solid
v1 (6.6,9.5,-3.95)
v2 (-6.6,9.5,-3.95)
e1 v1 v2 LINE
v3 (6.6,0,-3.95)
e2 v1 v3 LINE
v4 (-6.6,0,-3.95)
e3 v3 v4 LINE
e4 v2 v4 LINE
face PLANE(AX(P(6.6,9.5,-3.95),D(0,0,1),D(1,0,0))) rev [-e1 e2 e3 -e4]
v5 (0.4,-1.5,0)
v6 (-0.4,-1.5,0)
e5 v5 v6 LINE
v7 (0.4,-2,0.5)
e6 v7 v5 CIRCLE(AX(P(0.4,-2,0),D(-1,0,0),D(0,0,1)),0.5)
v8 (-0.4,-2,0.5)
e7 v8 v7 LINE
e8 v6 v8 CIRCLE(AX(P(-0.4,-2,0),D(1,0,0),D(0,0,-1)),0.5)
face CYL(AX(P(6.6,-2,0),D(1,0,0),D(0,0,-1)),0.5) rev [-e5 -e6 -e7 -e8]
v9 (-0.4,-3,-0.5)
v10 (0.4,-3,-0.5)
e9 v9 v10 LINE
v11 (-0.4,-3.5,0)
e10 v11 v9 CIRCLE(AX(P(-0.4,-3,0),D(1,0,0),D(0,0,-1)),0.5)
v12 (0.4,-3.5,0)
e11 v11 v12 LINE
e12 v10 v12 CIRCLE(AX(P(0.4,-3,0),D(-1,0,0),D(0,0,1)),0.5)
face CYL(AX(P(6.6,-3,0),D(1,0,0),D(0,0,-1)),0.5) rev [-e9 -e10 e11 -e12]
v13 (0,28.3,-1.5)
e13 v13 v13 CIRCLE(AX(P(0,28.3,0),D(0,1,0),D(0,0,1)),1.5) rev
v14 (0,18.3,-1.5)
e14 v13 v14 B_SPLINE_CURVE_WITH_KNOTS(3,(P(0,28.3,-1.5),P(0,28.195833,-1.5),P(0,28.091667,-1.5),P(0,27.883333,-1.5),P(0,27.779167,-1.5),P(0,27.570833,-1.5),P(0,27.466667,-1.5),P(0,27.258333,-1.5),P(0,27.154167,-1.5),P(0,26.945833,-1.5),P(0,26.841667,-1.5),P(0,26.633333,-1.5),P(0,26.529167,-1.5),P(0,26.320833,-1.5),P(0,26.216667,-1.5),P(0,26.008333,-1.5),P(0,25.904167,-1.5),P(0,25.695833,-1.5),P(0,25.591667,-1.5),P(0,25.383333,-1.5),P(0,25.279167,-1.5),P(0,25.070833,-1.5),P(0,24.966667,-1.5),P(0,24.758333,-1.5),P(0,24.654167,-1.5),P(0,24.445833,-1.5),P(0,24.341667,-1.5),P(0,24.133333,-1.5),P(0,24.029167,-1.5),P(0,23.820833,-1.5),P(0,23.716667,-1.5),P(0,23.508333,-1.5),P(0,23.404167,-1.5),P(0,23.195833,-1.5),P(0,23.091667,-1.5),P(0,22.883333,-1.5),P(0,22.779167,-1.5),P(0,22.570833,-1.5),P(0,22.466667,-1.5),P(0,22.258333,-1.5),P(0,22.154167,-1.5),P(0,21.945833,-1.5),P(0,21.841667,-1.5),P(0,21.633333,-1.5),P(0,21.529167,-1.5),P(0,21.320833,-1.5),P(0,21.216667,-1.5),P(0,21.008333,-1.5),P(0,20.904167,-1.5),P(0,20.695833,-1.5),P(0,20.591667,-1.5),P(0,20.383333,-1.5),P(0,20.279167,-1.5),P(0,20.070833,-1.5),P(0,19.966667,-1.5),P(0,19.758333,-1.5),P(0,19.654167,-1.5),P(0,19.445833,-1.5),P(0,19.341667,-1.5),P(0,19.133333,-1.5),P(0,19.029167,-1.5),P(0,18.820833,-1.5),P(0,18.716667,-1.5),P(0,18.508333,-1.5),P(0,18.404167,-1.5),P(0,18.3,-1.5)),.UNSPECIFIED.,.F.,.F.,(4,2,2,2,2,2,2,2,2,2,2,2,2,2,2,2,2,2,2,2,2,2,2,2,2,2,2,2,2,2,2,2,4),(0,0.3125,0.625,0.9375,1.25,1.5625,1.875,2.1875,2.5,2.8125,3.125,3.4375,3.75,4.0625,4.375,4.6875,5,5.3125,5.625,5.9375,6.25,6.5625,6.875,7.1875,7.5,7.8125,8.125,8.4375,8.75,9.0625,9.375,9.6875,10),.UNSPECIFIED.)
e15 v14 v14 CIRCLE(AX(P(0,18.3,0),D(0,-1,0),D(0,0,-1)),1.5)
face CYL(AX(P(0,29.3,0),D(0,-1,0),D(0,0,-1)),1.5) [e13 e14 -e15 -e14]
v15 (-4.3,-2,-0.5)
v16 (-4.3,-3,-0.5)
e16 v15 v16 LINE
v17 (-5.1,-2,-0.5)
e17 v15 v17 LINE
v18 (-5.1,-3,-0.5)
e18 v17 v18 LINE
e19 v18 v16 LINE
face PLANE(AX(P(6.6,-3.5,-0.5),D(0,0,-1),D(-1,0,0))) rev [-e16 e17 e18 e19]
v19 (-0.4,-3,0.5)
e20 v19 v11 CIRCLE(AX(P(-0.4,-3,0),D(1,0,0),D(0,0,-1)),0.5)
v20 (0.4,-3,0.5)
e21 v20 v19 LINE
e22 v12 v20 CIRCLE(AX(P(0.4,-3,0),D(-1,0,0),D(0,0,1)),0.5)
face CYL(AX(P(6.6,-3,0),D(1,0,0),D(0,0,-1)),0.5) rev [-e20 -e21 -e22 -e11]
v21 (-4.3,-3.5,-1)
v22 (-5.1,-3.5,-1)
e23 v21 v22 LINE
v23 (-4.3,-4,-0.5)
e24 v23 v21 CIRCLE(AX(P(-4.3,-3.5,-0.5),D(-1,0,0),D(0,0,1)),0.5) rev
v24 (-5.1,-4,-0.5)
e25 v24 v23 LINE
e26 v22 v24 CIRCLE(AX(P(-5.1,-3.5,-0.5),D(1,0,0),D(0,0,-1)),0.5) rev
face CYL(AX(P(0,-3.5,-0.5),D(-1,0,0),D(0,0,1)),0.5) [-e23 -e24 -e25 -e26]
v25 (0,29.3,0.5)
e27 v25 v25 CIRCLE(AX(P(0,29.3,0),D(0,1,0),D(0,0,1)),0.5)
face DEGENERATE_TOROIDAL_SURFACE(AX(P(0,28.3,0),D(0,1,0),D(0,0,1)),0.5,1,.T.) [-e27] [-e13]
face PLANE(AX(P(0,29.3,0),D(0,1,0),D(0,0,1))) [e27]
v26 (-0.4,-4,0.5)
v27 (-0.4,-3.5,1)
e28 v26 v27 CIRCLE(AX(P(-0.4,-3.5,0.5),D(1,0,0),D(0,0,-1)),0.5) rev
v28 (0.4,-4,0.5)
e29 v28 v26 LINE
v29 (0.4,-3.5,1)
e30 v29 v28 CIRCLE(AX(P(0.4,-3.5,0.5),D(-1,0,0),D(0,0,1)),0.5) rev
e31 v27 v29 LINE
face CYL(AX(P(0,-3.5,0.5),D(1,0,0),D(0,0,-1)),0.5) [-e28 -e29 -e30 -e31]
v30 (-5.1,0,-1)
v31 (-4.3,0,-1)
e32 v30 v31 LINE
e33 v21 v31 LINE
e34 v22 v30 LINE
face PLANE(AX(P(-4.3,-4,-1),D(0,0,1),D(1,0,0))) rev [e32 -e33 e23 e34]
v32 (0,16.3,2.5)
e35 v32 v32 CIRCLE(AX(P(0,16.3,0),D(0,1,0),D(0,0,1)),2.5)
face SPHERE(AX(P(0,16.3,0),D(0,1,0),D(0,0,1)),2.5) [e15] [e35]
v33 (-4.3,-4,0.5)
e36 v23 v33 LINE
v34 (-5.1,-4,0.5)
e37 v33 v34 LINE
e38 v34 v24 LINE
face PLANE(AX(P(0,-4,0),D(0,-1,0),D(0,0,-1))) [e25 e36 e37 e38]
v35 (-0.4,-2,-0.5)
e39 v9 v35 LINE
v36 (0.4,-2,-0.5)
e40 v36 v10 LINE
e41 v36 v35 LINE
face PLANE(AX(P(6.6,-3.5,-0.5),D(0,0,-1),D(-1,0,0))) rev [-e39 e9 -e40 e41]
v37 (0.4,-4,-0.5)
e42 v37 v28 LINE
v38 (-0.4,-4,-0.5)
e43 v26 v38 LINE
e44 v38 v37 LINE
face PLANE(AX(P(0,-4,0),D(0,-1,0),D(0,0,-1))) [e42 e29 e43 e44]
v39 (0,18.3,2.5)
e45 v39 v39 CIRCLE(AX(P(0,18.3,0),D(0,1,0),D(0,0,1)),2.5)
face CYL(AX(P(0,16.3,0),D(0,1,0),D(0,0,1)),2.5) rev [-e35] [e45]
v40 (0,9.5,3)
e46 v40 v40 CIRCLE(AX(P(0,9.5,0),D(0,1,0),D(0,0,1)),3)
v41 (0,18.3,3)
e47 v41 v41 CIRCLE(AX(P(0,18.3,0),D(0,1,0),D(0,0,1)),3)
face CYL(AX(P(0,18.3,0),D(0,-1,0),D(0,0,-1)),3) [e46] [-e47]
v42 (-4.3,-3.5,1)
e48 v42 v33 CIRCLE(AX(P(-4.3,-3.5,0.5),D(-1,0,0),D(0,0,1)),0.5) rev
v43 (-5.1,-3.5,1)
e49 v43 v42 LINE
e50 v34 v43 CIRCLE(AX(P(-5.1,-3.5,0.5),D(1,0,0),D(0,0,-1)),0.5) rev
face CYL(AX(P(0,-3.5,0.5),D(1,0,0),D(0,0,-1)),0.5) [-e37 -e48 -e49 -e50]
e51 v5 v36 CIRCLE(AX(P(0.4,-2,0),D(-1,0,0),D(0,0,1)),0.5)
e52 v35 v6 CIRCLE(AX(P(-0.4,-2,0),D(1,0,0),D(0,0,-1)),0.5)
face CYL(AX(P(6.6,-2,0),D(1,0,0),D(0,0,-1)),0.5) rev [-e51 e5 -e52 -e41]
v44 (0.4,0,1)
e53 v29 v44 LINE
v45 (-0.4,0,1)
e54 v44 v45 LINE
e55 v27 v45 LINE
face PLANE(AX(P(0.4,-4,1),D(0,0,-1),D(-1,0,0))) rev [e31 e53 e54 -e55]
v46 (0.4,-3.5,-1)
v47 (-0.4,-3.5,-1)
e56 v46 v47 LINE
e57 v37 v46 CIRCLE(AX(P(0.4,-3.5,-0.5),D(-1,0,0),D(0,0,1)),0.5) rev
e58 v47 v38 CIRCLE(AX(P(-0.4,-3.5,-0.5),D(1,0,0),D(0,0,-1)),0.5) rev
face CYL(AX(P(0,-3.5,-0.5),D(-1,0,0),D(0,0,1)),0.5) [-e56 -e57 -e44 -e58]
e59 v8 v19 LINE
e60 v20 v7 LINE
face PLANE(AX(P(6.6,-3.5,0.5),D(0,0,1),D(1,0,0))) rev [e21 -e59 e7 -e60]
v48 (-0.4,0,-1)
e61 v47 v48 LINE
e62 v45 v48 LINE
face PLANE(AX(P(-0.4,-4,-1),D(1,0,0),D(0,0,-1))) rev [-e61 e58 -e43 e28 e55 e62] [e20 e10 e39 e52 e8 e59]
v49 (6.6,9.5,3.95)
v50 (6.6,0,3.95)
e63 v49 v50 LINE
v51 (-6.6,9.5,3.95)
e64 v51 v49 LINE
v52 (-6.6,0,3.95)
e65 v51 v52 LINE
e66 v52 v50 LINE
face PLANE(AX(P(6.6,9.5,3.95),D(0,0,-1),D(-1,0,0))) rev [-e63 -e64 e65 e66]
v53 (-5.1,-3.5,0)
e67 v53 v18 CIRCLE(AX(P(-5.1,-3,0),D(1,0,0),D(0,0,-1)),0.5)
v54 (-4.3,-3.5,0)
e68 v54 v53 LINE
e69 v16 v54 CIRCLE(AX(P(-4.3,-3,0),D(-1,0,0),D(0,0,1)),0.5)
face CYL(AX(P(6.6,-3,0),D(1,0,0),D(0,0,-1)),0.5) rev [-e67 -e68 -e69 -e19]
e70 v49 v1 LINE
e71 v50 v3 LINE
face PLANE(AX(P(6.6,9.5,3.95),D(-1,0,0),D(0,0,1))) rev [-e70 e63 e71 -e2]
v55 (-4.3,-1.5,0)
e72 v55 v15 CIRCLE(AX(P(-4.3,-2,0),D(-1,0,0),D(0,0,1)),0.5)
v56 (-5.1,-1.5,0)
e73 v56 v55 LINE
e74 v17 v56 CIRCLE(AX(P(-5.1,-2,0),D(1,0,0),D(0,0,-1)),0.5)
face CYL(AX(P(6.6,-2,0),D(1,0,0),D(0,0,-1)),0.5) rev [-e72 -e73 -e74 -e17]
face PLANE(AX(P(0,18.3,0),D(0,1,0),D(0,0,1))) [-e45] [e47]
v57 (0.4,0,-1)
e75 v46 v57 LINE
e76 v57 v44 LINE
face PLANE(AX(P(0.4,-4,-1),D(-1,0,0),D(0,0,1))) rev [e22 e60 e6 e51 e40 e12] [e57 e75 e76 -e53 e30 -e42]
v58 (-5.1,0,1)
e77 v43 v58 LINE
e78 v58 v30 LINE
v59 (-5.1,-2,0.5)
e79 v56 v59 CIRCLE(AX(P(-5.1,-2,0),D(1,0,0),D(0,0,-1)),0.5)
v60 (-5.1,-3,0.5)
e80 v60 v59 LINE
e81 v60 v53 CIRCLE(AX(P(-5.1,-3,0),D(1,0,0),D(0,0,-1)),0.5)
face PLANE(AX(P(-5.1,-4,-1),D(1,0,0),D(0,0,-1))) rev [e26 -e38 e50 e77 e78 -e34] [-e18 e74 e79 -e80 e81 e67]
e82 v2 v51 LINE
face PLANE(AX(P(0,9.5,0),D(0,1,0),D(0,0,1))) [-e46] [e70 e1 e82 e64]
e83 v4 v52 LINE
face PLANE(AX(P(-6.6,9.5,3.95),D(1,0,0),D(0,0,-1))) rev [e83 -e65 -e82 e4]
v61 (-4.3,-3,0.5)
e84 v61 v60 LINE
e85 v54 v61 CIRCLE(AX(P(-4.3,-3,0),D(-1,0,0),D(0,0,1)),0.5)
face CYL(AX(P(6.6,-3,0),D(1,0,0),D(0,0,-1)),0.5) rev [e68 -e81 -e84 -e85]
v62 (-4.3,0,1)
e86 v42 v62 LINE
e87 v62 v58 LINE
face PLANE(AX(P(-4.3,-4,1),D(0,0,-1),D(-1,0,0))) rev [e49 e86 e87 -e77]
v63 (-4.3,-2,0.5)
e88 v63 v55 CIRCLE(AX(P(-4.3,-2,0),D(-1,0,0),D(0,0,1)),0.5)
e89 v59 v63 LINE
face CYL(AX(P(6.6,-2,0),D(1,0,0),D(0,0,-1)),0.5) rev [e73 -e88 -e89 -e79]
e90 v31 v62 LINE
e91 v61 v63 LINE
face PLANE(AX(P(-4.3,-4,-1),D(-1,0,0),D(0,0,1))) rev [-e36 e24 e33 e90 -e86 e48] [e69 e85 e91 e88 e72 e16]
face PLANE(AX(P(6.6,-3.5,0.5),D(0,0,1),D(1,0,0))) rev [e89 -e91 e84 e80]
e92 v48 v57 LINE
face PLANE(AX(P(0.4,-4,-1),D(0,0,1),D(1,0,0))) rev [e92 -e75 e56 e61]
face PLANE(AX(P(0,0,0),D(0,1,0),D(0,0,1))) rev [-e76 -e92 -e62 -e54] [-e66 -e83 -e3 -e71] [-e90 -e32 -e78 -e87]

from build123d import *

# Parameters (mm, degrees)
SKETCH1_W           = 13.2
SKETCH1_H           = 7.9
BOSS_EXTRUDE1_DEPTH = 9.5
SKETCH2_R           = 3
BOSS_EXTRUDE2_DEPTH = 8.8
SKETCH4_R           = 2.5
CUT_EXTRUDE1_DEPTH  = 2
SKETCH5_R           = 1.5
BOSS_EXTRUDE3_DEPTH = 13
REVOLVE2_ANGLE      = 180
FILLET1_R           = 1
SKETCH6_W           = 0.8
SKETCH6_H           = 2
BOSS_EXTRUDE4_DEPTH = 4
SKETCH7_W           = 1
SKETCH7_H           = 2
CUT_EXTRUDE3_DEPTH  = 32.795951
FILLET3_R           = 0.5


with BuildPart() as part:
    # Sketch1 → Boss-Extrude1 (new body)
    with BuildSketch(Plane(origin=(0, 0, 0), x_dir=(1, 0, 0), z_dir=(0, 1, 0))):
        Rectangle(SKETCH1_W, SKETCH1_H)
    extrude(amount=BOSS_EXTRUDE1_DEPTH)

    # Sketch2 → Boss-Extrude2 (add)
    with BuildSketch(Plane(origin=(0, 9.5, 0), x_dir=(1, 0, 0), z_dir=(0, 1, 0))):
        with Locations(Location((0, 0, 0), (0, 0, 270))):
            Circle(SKETCH2_R)
    extrude(amount=BOSS_EXTRUDE2_DEPTH)

    # Sketch4 → Cut-Extrude1 (cut)
    with BuildSketch(Plane(origin=(0, 18.3, 0), x_dir=(1, 0, 0), z_dir=(0, 1, 0))):
        with Locations(Location((0, 0, 0), (0, 0, 270))):
            Circle(SKETCH4_R)
    extrude(amount=-CUT_EXTRUDE1_DEPTH, mode=Mode.SUBTRACT)

    # Sketch5 → Boss-Extrude3 (add)
    with BuildSketch(Plane(origin=(0, 16.3, 0), x_dir=(1, 0, 0), z_dir=(0, 1, 0))):
        with Locations(Location((0, 0, 0), (0, 0, 90))):
            Circle(SKETCH5_R)
    extrude(amount=BOSS_EXTRUDE3_DEPTH)

    # Sketch3 → Revolve2 (revolve)
    with BuildSketch(Plane(origin=(0, 16.3, 0), x_dir=(1, 0, 0), z_dir=(0, 1, 0))):
        with BuildLine():
            Line((0, -2.5), (0, 2.5))
            ThreePointArc((0, 2.5), (-2.5, 0), (0, -2.5))
        make_face()
    revolve(axis=Axis((0, 16.3, 3), (0, 0, -1)), revolution_arc=REVOLVE2_ANGLE)

    # Fillet1
    fillet1_edges = [part.edges().sort_by_distance(p)[0] for p in [
        (0, 29.3, 1.5),
    ]]
    fillet(fillet1_edges, radius=FILLET1_R)

    # Sketch6 → Boss-Extrude4 (add)
    with BuildSketch(Plane.XZ):
        with Locations((-4.7, 0)):
            Rectangle(SKETCH6_W, SKETCH6_H)
        Rectangle(SKETCH6_W, SKETCH6_H)
    extrude(amount=BOSS_EXTRUDE4_DEPTH)

    # Sketch7 → Cut-Extrude3 (cut, through all)
    with BuildSketch(Plane.ZY.offset(5.1)):
        with Locations((0, -2.5)):
            Rectangle(SKETCH7_W, SKETCH7_H)
    extrude(amount=-CUT_EXTRUDE3_DEPTH, mode=Mode.SUBTRACT)

    # Fillet3
    fillet3_edges = [part.edges().sort_by_distance(p)[0] for p in [
        (0, -4, 1),
        (0, -4, -1),
        (-4.7, -4, -1),
        (-4.7, -4, 1),
        (0, -3.5, -0.5),
        (0, -1.5, -0.5),
        (0, -3.5, 0.5),
        (0, -1.5, 0.5),
        (-4.7, -1.5, 0.5),
        (-4.7, -1.5, -0.5),
        (-4.7, -3.5, 0.5),
        (-4.7, -3.5, -0.5),
    ]]
    fillet(fillet3_edges, radius=FILLET3_R - 0.0001)  # a hair under: the kernel refuses the full size


solid = part.part
